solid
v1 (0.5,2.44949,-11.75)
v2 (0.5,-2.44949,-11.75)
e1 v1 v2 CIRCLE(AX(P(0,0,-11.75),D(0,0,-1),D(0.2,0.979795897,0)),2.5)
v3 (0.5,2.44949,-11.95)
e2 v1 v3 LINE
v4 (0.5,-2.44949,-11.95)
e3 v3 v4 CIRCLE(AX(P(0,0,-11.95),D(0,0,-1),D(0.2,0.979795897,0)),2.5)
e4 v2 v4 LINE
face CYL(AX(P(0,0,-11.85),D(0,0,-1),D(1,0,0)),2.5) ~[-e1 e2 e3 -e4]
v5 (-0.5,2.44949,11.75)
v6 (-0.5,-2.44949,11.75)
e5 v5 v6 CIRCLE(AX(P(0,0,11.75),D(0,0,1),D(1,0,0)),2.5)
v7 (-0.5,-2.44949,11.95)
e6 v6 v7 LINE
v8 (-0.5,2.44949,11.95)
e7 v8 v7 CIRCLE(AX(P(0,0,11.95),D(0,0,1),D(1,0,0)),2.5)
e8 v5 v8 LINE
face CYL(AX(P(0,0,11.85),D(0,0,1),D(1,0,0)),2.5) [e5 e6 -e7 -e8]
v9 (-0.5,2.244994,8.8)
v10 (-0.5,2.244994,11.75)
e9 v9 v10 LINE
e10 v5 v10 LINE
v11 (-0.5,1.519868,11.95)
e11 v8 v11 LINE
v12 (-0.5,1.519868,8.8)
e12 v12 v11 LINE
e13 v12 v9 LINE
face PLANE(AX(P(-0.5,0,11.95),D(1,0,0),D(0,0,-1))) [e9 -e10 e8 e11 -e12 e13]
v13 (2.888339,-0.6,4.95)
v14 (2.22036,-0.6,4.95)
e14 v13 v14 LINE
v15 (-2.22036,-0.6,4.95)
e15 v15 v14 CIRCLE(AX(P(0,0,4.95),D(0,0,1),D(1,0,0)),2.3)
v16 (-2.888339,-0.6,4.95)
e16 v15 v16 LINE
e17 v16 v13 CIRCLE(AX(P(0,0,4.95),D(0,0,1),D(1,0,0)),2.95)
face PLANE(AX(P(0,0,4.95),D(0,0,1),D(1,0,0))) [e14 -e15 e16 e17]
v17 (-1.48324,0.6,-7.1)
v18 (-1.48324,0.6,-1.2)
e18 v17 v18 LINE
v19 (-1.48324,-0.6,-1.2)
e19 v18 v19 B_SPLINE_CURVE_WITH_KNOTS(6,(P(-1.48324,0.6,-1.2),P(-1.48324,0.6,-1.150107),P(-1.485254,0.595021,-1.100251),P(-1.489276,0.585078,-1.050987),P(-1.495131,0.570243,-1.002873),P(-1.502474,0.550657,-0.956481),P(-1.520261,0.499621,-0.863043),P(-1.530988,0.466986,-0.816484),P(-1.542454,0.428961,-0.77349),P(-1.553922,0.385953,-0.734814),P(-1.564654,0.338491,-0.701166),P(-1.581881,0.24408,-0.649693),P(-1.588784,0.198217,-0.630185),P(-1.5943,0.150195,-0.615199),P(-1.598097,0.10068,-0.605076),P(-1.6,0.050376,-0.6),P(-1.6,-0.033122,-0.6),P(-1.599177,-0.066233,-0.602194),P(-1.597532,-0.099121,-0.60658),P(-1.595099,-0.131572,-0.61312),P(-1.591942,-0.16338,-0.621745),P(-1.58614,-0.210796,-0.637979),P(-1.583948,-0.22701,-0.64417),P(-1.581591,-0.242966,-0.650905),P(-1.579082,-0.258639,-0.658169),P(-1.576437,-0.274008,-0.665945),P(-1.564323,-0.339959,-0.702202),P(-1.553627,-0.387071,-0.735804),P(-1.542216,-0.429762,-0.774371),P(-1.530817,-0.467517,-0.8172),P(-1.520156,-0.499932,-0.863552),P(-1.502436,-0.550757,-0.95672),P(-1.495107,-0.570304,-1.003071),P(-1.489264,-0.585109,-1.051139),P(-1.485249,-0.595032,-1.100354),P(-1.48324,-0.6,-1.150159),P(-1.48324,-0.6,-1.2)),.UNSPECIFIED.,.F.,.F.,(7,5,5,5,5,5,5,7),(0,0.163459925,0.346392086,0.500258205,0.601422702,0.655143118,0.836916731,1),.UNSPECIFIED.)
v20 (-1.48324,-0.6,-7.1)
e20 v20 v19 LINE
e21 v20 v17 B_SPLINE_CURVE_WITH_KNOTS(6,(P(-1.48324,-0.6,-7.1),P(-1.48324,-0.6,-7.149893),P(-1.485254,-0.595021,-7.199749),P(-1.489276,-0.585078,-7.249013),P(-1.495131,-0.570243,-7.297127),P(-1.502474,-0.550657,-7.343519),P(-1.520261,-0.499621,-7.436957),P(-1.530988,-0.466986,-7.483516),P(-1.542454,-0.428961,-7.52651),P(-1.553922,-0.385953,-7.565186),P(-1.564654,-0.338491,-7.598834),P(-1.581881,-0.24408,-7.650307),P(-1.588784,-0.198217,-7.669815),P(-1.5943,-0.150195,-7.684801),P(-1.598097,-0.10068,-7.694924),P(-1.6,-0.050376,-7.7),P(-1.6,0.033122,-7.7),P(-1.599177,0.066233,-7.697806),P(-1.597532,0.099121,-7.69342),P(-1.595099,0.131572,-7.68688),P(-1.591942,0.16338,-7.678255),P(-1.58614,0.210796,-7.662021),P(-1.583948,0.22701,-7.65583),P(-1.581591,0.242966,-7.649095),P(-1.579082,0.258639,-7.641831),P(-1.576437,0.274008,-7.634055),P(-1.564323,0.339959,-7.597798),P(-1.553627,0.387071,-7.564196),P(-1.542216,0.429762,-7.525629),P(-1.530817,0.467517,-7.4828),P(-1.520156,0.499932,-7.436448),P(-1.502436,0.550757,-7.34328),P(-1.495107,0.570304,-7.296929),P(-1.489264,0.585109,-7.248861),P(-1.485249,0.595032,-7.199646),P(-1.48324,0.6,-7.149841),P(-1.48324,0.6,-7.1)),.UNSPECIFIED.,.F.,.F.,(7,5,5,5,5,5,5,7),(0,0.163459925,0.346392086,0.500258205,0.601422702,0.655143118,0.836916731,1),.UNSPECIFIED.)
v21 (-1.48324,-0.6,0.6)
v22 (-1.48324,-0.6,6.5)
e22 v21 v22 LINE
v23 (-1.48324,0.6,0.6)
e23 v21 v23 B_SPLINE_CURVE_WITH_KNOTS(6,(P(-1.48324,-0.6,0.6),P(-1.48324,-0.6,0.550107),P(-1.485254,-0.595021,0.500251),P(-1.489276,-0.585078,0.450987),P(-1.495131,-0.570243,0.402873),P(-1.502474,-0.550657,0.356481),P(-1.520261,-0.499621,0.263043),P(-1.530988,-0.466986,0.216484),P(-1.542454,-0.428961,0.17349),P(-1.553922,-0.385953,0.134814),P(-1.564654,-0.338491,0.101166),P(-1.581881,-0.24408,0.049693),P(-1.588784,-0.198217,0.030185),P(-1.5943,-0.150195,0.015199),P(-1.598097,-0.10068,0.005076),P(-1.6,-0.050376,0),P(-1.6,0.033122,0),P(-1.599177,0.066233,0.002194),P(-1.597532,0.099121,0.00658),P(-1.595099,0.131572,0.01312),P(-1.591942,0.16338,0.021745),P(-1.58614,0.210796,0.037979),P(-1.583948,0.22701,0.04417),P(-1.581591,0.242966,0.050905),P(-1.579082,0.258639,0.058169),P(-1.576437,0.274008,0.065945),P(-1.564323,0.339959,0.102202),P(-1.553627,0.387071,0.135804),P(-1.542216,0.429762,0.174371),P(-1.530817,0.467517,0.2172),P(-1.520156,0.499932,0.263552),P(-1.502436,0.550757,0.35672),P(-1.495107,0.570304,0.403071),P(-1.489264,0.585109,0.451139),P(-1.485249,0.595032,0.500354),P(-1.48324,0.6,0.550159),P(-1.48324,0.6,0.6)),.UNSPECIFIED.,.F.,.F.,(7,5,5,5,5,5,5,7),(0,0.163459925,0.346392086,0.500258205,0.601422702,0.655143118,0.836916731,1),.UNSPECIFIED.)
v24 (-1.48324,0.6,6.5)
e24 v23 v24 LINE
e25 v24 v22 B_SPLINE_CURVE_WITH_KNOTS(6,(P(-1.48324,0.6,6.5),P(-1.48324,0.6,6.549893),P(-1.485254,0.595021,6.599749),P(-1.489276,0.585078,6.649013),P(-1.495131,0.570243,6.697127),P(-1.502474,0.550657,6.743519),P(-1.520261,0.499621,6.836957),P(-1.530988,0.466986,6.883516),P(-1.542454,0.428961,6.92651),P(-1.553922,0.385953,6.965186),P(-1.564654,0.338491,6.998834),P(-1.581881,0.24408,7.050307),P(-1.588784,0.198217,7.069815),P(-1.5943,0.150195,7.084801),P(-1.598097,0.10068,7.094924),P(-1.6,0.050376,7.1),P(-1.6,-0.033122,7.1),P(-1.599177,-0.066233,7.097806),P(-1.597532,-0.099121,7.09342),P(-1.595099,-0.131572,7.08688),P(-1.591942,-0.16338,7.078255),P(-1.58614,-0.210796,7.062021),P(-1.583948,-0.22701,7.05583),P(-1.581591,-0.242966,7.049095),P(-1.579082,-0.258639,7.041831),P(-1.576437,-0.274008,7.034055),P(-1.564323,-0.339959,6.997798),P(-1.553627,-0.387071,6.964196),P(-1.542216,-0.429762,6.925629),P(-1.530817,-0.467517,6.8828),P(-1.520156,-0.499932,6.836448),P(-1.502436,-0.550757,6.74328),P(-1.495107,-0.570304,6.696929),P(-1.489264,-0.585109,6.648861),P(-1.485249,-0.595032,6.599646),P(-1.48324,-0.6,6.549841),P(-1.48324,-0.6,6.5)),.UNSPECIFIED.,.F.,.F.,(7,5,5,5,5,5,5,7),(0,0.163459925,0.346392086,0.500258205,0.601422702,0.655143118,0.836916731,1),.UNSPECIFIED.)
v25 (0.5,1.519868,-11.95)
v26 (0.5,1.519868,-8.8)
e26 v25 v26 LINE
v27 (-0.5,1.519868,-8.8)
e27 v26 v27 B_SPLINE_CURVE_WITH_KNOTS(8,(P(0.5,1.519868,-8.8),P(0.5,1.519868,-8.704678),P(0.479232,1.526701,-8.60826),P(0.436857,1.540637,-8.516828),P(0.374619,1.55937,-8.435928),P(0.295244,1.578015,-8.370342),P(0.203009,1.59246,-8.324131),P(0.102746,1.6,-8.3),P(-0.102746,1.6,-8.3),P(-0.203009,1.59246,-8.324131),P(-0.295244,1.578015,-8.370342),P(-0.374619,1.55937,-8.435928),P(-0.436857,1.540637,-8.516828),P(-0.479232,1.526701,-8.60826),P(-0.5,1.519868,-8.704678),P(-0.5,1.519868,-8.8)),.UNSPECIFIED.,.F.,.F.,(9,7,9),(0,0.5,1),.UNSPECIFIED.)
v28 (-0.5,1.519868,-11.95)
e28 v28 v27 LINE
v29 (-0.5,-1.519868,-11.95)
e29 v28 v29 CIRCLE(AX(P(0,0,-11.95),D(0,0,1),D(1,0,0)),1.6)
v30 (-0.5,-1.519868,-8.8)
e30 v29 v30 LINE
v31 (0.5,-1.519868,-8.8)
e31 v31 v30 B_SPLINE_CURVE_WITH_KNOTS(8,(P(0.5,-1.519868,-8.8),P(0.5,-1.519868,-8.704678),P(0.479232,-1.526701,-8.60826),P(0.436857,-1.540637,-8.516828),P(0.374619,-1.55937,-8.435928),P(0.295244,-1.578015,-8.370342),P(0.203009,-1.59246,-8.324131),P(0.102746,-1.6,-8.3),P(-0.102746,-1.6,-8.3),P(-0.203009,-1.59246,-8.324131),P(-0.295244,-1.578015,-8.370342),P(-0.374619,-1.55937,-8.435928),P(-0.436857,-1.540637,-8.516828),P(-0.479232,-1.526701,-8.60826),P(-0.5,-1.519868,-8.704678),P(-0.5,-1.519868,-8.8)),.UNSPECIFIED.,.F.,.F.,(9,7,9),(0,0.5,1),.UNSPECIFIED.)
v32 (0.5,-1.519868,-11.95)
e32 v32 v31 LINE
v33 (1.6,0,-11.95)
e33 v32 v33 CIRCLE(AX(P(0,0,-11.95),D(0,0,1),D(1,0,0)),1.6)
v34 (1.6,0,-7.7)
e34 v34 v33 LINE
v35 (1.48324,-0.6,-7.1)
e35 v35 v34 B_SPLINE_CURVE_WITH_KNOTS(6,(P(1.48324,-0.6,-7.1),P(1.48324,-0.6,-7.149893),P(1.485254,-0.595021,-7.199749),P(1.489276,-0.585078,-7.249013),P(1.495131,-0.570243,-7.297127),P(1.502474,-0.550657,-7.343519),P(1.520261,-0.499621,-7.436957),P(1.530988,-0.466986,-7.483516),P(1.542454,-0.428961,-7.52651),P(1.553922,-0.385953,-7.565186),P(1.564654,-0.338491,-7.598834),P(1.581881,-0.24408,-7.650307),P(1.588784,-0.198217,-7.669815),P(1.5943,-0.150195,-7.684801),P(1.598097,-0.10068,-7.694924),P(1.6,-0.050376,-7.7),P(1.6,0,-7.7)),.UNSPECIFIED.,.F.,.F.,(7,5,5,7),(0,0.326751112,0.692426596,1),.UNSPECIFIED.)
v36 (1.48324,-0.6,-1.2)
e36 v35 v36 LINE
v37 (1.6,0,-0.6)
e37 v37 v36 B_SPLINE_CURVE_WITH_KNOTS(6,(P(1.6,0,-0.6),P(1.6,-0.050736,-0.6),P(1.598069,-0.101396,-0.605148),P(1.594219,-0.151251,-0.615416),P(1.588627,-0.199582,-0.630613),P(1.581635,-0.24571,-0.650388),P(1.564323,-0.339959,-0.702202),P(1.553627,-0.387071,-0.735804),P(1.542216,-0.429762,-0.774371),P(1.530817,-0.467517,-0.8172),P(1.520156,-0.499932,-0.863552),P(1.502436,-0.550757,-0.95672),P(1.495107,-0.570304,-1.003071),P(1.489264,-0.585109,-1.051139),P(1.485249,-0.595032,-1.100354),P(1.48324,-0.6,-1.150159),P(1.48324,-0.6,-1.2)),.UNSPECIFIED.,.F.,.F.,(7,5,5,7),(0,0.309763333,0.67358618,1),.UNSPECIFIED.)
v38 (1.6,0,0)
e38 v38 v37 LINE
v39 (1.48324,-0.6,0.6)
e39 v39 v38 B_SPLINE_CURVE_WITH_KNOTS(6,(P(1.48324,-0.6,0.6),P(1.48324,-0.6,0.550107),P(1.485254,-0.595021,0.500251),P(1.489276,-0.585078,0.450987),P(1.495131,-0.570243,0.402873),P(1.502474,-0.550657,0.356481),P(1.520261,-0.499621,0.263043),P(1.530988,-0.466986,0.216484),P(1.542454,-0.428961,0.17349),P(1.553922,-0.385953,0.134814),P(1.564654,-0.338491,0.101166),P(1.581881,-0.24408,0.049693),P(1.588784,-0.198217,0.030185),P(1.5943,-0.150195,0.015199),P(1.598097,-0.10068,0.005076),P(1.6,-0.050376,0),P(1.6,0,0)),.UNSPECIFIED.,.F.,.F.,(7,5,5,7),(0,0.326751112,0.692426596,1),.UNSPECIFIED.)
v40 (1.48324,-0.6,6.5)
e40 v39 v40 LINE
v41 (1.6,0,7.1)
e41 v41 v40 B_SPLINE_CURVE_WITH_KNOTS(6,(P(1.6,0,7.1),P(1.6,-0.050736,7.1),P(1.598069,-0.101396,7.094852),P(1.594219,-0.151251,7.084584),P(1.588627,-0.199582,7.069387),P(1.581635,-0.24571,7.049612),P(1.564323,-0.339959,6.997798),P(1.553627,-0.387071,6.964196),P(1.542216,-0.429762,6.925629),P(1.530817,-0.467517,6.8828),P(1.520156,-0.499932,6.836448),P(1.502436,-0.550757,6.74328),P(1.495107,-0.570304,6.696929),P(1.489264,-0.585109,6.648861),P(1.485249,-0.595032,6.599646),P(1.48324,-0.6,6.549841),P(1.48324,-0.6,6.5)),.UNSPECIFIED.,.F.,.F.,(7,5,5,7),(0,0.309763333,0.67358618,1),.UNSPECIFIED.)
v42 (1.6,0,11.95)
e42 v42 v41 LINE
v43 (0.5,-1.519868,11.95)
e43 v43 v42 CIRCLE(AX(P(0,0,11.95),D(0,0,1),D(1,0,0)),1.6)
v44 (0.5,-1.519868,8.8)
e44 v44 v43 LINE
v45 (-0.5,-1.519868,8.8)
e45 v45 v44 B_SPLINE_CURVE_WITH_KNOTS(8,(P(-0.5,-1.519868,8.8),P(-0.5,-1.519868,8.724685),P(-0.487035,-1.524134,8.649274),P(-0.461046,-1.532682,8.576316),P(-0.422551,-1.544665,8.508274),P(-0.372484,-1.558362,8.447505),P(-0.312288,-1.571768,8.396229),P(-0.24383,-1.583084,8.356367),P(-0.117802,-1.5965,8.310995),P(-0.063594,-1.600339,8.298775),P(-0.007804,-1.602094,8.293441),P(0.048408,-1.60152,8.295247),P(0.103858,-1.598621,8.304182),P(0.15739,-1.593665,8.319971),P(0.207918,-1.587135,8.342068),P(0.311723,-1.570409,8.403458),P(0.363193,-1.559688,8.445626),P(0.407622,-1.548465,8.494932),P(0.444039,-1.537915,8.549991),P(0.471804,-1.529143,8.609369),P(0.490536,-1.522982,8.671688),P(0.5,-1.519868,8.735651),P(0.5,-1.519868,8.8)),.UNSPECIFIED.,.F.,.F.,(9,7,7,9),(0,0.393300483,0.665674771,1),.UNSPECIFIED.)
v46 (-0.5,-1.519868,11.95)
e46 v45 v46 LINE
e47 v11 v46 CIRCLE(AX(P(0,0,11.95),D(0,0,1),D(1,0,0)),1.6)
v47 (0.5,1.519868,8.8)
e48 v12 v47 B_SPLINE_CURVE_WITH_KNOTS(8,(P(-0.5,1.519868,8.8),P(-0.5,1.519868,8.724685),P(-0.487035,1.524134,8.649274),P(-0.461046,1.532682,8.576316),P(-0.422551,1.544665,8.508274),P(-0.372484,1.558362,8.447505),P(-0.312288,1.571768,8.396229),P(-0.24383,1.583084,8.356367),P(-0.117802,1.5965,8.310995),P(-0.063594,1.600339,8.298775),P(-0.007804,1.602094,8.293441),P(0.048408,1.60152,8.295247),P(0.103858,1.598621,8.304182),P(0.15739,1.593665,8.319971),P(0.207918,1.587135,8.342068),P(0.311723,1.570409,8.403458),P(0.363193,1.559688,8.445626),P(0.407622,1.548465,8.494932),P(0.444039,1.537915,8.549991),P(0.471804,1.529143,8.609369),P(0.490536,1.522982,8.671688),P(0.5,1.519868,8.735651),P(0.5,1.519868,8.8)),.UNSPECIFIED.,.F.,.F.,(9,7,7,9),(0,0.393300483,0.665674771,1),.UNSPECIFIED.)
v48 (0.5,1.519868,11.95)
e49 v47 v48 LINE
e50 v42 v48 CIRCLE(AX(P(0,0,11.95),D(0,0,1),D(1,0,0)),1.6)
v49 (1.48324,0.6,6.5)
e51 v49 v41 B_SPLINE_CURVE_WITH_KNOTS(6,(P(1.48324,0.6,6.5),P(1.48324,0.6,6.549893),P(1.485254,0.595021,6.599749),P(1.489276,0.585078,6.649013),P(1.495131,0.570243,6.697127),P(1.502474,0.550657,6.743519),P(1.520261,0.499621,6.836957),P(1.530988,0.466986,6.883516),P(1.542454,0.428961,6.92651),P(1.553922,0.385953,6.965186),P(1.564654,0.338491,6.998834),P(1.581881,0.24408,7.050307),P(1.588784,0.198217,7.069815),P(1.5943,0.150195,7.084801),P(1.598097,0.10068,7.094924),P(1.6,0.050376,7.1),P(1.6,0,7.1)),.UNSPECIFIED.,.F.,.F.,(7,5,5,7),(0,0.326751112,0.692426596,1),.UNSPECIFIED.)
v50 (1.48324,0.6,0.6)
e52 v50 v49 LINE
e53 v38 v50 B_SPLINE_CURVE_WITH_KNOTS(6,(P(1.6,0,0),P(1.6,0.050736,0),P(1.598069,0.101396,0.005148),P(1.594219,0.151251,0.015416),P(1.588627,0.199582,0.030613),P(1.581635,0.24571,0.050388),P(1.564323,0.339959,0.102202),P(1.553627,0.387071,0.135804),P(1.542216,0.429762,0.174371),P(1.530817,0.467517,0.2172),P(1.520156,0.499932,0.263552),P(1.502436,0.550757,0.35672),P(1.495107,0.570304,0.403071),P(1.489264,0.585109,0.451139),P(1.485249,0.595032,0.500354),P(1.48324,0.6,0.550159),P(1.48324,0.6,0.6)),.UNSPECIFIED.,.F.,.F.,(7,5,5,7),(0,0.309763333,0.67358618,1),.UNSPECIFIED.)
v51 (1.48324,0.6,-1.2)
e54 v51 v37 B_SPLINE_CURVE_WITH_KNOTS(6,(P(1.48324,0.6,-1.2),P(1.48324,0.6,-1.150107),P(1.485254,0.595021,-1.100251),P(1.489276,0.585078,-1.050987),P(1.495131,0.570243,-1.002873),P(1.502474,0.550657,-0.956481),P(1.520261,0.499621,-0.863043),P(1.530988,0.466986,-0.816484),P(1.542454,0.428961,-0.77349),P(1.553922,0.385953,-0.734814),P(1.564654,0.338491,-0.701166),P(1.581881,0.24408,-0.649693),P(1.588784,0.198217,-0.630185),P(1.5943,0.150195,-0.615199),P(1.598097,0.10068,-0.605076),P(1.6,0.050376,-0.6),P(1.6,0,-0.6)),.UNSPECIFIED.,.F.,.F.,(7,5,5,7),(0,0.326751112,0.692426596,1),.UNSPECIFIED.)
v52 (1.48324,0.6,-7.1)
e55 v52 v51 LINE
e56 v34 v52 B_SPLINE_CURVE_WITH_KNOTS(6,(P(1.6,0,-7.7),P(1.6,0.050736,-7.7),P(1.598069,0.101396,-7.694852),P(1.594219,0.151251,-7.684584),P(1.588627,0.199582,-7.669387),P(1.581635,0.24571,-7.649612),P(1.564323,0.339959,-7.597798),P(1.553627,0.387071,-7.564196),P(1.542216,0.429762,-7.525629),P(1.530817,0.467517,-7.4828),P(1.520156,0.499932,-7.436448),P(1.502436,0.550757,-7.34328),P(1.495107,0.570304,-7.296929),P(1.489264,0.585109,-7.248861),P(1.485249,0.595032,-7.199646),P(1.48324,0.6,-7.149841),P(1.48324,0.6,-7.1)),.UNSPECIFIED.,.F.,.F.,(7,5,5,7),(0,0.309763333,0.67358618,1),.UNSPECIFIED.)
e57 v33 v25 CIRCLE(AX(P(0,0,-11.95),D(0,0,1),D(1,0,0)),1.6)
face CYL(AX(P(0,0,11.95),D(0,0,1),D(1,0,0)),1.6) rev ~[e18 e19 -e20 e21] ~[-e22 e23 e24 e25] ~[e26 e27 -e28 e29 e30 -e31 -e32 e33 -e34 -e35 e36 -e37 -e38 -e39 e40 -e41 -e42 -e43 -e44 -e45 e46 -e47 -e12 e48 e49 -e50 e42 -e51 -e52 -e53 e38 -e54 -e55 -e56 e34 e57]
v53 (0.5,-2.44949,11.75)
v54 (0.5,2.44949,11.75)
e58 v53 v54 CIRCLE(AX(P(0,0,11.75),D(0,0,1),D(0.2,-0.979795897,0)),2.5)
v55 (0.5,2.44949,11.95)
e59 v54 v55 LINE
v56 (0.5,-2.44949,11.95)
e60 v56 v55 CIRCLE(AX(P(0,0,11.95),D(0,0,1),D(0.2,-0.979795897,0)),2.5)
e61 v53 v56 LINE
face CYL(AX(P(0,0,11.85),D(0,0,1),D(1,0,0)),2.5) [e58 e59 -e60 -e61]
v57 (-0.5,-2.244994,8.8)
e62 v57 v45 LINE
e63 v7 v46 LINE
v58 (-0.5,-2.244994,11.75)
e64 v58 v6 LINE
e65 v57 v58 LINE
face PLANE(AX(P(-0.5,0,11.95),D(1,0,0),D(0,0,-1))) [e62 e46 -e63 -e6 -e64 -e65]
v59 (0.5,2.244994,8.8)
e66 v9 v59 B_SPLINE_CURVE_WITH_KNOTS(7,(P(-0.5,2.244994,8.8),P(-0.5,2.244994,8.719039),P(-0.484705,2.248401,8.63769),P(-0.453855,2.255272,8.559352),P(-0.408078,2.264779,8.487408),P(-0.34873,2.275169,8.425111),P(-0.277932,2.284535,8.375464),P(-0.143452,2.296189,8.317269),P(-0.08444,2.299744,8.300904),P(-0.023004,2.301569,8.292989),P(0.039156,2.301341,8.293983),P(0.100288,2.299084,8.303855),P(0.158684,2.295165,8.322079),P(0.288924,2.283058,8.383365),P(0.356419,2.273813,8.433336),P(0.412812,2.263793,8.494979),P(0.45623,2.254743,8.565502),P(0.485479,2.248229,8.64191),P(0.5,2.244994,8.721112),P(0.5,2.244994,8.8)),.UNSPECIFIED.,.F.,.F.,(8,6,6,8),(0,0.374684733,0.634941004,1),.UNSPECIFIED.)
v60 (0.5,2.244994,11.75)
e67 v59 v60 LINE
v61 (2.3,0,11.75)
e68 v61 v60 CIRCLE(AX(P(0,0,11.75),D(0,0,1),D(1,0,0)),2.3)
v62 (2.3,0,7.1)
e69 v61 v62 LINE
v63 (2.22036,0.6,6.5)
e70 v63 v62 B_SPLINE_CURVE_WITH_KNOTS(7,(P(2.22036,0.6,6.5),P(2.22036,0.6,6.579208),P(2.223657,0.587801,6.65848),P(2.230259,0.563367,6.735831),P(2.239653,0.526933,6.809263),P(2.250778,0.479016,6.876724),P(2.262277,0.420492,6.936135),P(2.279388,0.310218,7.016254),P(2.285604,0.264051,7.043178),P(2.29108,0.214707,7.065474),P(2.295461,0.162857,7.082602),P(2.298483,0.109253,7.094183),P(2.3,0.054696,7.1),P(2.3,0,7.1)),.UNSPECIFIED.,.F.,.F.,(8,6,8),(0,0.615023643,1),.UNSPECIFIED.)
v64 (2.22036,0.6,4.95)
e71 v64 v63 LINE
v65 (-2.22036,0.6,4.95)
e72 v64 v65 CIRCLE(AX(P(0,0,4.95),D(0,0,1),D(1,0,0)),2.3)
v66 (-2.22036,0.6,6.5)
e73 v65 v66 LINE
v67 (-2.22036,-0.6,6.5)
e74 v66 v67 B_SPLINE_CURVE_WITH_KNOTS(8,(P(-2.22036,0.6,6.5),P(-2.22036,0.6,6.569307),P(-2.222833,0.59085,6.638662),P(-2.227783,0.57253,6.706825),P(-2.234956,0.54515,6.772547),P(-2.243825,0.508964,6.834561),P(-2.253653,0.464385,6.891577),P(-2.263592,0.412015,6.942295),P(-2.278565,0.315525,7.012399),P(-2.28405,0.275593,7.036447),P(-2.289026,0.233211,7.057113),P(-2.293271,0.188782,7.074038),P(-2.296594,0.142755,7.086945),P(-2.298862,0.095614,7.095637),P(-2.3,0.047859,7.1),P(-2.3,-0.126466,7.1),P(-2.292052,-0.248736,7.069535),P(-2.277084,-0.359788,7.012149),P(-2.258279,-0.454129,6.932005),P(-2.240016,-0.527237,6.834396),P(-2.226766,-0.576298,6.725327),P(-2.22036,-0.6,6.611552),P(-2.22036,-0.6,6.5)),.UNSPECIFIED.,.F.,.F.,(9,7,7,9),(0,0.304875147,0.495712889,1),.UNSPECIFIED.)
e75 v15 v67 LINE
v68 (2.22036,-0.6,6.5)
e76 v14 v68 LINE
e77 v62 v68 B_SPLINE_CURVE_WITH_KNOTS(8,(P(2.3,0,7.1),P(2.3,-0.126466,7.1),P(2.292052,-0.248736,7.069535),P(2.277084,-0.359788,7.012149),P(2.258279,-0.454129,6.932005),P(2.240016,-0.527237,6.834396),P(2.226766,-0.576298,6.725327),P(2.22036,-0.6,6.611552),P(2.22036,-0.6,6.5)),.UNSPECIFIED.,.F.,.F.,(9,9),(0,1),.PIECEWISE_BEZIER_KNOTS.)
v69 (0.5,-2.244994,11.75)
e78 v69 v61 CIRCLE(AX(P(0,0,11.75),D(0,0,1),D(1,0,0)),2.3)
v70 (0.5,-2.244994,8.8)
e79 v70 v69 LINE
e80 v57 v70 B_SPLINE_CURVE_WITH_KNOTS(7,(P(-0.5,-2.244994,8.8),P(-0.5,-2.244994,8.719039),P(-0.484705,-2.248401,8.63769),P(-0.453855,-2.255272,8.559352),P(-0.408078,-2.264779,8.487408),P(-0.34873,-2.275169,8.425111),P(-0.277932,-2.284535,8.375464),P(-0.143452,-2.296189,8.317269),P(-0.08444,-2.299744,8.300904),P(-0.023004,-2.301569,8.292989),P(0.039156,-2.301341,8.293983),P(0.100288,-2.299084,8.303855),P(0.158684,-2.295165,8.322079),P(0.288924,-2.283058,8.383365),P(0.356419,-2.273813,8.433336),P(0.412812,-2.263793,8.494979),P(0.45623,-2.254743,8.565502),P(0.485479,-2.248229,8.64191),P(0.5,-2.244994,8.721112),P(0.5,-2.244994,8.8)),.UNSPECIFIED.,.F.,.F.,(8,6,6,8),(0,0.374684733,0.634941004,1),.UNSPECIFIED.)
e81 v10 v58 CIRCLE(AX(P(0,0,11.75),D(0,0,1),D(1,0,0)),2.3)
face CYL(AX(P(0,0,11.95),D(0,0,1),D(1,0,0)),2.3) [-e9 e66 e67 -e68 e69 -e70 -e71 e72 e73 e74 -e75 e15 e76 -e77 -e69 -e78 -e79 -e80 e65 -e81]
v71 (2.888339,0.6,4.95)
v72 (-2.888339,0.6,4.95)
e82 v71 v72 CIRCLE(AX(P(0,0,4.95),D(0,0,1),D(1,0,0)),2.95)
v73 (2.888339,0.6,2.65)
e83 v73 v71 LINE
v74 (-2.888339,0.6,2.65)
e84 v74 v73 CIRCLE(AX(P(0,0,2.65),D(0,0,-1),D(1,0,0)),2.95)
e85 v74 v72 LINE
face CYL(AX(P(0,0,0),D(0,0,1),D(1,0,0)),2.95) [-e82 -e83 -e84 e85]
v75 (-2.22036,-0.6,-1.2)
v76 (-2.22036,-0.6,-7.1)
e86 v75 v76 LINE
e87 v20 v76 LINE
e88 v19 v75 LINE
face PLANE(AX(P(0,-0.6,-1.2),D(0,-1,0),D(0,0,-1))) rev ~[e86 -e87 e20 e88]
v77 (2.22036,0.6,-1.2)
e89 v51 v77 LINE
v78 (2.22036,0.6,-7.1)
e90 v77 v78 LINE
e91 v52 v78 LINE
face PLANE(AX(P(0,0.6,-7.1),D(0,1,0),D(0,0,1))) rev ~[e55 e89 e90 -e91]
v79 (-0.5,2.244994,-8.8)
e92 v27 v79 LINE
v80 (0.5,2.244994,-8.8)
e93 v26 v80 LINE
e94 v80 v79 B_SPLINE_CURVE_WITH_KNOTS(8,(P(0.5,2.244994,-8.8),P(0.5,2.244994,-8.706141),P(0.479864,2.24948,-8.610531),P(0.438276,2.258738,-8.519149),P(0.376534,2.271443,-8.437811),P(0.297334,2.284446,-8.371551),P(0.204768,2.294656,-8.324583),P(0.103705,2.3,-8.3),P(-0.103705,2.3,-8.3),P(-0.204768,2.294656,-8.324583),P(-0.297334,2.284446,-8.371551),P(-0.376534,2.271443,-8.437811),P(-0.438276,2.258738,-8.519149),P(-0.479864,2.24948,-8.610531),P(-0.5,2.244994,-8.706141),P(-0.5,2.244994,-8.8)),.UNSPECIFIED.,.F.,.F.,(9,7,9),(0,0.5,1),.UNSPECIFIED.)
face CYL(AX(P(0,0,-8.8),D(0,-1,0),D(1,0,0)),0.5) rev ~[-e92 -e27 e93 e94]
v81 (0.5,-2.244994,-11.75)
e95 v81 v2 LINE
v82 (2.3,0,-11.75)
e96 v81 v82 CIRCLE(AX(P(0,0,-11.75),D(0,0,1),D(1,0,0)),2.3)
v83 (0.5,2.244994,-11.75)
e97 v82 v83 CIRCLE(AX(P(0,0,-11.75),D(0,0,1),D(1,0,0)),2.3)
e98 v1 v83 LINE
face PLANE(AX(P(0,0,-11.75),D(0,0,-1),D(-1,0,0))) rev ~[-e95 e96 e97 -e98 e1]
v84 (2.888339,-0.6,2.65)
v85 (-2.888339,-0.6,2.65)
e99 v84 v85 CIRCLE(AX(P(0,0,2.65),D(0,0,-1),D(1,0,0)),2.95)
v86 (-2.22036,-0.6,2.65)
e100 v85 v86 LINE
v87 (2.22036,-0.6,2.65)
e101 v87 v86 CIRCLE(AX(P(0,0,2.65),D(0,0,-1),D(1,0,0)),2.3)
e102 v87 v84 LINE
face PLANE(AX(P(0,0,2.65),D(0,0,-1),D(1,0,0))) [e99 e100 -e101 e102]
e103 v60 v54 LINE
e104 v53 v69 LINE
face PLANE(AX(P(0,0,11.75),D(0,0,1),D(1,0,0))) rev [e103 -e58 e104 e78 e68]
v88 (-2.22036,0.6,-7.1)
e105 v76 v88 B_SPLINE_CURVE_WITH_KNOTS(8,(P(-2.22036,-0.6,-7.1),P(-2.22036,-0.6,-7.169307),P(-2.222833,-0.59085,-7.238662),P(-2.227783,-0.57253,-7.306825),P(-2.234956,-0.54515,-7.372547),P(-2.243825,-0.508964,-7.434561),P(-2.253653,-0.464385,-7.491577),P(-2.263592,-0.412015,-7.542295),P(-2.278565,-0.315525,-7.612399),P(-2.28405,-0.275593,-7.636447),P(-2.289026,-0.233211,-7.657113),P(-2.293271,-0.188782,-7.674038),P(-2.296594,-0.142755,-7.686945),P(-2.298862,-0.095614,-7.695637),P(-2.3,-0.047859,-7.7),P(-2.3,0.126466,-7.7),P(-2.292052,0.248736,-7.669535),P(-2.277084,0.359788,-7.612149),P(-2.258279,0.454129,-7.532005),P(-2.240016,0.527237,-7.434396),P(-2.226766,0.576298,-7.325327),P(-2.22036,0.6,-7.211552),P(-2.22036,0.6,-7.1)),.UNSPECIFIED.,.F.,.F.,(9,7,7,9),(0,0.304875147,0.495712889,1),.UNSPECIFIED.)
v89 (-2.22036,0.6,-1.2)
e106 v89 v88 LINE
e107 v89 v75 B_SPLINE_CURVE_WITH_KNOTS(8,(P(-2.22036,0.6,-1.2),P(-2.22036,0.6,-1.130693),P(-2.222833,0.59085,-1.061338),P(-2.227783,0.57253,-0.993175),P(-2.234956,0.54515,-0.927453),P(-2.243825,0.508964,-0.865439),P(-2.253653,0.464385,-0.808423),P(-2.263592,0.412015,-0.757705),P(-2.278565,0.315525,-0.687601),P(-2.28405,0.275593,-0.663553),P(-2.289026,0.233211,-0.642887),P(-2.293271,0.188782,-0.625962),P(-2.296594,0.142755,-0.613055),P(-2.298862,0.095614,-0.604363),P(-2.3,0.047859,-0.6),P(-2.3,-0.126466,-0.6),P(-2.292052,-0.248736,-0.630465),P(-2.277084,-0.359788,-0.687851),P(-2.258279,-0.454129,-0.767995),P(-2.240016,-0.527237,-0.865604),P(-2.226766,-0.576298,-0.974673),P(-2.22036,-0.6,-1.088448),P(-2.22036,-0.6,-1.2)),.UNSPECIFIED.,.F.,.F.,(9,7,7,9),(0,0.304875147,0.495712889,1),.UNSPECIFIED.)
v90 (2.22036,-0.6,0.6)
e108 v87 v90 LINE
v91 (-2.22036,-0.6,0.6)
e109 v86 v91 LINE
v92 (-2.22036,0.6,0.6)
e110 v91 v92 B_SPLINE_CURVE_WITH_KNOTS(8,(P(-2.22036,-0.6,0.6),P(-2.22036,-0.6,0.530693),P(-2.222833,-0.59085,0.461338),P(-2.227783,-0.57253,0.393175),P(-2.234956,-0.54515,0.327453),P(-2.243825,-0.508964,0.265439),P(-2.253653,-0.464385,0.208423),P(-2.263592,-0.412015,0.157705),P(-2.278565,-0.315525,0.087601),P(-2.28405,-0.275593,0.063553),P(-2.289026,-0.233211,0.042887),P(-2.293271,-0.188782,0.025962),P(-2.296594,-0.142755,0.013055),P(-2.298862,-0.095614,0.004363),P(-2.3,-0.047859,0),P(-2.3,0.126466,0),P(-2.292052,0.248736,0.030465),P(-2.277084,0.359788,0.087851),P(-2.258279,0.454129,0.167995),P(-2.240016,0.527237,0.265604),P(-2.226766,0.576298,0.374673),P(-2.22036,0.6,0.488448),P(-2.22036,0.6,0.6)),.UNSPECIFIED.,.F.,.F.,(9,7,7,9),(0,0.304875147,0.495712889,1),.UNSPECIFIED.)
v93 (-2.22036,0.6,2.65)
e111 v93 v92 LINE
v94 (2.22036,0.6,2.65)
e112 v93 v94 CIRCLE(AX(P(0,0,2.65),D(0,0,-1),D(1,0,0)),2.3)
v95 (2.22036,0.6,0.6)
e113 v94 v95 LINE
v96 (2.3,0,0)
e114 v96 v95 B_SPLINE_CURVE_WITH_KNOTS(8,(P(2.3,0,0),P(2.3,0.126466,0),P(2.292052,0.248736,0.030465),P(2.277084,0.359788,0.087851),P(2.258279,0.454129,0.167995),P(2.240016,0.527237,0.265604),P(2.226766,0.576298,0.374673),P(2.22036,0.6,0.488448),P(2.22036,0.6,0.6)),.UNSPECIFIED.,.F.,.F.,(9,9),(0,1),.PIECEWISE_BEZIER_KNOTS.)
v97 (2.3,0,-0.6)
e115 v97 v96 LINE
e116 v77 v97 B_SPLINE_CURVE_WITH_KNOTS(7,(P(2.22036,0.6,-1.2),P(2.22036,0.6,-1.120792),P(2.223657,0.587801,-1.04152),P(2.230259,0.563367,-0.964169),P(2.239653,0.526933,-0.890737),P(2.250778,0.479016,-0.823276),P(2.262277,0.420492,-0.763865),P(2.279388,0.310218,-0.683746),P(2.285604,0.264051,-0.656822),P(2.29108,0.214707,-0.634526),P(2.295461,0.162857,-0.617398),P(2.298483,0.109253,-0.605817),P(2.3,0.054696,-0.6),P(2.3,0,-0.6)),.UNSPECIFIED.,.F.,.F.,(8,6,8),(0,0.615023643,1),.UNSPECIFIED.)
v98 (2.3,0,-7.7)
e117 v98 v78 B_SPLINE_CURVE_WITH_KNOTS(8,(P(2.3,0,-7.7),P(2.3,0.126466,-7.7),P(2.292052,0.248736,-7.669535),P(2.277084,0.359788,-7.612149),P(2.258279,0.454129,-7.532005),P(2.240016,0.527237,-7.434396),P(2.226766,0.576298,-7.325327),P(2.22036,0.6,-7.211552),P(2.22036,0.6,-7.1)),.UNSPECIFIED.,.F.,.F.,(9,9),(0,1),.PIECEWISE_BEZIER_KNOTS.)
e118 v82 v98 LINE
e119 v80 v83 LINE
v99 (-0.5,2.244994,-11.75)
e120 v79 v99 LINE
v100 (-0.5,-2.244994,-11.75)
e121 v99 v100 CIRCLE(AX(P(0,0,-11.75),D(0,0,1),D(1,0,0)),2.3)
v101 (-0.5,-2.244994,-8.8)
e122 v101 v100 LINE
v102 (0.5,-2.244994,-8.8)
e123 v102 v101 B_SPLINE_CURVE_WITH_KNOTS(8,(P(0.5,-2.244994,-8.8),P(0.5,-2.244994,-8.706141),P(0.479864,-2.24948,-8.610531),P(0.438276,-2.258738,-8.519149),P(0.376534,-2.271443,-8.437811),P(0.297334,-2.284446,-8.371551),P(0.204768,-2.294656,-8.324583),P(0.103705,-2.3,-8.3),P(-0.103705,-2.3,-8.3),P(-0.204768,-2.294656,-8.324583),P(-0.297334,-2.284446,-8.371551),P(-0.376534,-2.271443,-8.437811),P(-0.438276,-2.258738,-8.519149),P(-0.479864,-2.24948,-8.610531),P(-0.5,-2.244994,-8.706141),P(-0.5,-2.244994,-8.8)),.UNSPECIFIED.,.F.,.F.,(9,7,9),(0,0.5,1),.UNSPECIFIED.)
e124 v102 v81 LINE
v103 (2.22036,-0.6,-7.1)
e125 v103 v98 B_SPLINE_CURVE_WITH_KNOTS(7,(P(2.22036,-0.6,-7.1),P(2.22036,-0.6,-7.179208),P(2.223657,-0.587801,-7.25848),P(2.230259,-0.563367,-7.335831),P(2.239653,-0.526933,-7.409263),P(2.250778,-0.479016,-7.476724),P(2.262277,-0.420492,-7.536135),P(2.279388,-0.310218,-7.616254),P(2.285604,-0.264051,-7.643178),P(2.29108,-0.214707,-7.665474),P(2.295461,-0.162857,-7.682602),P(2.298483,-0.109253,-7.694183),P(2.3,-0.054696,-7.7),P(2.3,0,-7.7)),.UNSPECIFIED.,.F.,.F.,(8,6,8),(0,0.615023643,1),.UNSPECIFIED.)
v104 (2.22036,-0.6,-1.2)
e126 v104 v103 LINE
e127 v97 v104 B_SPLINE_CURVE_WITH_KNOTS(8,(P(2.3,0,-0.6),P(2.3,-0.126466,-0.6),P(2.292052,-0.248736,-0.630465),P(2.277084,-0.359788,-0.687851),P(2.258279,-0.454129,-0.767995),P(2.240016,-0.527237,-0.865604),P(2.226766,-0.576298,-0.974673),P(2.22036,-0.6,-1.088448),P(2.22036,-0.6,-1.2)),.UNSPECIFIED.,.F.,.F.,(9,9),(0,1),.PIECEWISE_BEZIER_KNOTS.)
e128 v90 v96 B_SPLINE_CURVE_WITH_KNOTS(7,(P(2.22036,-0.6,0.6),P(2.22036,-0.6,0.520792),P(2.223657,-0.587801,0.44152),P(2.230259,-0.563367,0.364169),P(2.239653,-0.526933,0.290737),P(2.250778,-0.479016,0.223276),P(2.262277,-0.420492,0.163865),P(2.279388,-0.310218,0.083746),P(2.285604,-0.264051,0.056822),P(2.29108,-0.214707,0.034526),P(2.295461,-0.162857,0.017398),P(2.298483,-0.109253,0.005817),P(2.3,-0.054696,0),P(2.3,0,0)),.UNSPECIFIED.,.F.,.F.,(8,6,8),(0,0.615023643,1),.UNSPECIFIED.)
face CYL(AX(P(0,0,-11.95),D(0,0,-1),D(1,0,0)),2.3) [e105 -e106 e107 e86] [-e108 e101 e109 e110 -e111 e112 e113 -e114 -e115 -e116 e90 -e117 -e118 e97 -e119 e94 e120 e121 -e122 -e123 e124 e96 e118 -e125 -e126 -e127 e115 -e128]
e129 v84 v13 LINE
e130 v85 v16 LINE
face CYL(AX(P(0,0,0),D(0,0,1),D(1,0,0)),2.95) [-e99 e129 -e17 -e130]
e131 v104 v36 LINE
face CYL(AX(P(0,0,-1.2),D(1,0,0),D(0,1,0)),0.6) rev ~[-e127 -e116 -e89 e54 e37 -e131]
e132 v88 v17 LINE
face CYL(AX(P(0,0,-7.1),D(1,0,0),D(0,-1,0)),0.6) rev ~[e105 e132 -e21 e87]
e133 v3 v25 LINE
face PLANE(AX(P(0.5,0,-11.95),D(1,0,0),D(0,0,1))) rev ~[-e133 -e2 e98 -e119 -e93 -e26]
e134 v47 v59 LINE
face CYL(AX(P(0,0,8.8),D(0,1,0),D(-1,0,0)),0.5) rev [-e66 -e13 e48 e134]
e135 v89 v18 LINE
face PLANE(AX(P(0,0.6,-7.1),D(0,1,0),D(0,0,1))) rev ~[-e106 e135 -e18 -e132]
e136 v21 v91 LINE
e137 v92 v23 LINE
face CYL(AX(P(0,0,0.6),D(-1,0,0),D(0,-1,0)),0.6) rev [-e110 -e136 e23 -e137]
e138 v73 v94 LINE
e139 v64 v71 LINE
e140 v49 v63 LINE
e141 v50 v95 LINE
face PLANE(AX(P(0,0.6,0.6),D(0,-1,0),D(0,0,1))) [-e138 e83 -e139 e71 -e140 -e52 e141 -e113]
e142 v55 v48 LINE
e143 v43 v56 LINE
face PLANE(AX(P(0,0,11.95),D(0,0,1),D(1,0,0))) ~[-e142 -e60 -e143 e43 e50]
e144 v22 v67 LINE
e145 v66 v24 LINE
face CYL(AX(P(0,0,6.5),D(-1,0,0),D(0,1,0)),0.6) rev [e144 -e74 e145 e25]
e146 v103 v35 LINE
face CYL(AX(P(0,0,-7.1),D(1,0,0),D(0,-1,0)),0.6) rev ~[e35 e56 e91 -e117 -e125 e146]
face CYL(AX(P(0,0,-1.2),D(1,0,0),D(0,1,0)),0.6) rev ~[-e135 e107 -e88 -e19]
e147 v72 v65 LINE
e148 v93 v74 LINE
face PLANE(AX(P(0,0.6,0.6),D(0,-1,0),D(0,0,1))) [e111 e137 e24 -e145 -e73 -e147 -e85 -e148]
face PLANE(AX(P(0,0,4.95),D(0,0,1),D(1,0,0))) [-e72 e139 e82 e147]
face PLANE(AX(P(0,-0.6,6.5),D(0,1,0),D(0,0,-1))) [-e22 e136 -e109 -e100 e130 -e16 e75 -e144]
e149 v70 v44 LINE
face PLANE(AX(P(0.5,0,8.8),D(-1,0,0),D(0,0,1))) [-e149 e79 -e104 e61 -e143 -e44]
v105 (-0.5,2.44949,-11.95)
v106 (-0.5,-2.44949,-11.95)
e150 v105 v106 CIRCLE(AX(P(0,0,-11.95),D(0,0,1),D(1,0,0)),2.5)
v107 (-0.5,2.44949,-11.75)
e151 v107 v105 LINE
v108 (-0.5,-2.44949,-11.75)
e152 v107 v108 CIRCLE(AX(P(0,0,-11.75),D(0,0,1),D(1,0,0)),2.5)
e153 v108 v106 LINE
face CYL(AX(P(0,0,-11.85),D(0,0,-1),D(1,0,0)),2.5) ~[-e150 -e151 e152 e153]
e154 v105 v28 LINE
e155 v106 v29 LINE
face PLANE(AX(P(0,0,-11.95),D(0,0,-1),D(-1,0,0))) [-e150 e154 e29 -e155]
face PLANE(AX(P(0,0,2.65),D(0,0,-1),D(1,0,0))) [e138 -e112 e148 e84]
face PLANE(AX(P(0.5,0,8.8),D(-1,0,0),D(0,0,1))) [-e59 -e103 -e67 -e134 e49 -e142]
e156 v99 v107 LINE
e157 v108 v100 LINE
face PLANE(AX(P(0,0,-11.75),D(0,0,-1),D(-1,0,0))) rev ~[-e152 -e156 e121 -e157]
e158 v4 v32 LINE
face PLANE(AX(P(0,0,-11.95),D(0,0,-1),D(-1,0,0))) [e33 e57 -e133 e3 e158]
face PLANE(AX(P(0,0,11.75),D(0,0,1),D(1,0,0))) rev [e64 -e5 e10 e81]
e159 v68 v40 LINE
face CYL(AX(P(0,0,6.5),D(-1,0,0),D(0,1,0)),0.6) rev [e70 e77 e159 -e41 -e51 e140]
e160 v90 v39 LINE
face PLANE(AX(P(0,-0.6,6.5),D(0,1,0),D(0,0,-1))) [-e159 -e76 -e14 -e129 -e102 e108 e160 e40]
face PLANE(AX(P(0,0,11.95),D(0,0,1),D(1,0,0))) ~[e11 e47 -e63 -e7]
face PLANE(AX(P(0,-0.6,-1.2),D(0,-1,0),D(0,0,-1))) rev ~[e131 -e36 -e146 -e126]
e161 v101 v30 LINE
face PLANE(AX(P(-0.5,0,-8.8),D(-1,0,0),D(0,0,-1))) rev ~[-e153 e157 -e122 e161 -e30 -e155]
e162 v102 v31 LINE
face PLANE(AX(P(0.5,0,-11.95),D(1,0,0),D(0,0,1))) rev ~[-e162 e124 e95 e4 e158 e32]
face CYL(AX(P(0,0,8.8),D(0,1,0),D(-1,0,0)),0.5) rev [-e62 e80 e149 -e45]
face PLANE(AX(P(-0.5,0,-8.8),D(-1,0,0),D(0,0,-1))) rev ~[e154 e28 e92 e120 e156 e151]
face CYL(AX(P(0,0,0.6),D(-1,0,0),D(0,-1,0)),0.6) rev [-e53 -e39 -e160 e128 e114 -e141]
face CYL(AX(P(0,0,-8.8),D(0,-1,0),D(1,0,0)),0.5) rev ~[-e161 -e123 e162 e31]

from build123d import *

# Parameters (mm, degrees)
F0_R      = 2.95
F1_DEPTH  = 11.95
F2_R      = 2.95
F2_R_2    = 2.3
F3_DEPTH  = 7
F4_R      = 2.95
F4_R_2    = 2.3
F5_DEPTH  = 14.6
F6_R      = 1.6
F7_DEPTH  = 23.901
F9_DEPTH  = 12.5
F10_W     = 0.2
F10_H     = 0.2
F12_DEPTH = 12.5
F13_DEPTH = 12.5
F15_DEPTH = 12.5


# Not quite as in the source:
# - a pattern or mirror of a feature is missing from the dataset's text; its kind, count and spacing are read off the source's solid


with BuildPart() as f1:
    # F0 (on Top) → F1 (new body, symmetric)
    with BuildSketch(Plane.XY):
        Circle(F0_R)
    extrude(amount=F1_DEPTH, both=True)

    # F2 (on face) → F3 (cut)
    with BuildSketch(Plane.XY.offset(11.95)):
        Circle(F2_R)
        Circle(F2_R_2, mode=Mode.SUBTRACT)
    extrude(amount=-F3_DEPTH, mode=Mode.SUBTRACT)

    # F4 (on face) → F5 (cut)
    with BuildSketch(Plane(origin=(0, 0, -11.95), x_dir=(1, 0, 0), z_dir=(0, 0, -1))):
        Circle(F4_R)
        Circle(F4_R_2, mode=Mode.SUBTRACT)
    extrude(amount=-F5_DEPTH, mode=Mode.SUBTRACT)

    # F6 (on face) → F7 (cut, through all)
    with BuildSketch(Plane.XY.offset(11.95)):
        Circle(F6_R)
    extrude(amount=-F7_DEPTH, mode=Mode.SUBTRACT)

    # F8 (on Front) → F9 (cut, symmetric)
    with BuildSketch(Plane.XZ):
        with BuildLine():
            ThreePointArc((0.5, 8.8), (0, 9.3), (-0.5, 8.8))
            Line((-0.5, 8.8), (0.5, 8.8))
        make_face()
        with BuildLine():
            Line((-0.5, 11.95), (-0.5, 8.8))
            ThreePointArc((-0.5, 8.8), (0, 9.3), (0.5, 8.8))
            Line((0.5, 8.8), (0.5, 11.95))
            Line((0.5, 11.95), (-0.5, 11.95))
        make_face()
        with BuildLine():
            Line((0.5, 8.8), (-0.5, 8.8))
            ThreePointArc((-0.5, 8.8), (0, 8.3), (0.5, 8.8))
        make_face()
        with BuildLine():
            Line((-0.5, -8.8), (-0.5, -11.95))
            Line((-0.5, -11.95), (0.5, -11.95))
            Line((0.5, -11.95), (0.5, -8.8))
            ThreePointArc((0.5, -8.8), (0, -9.3), (-0.5, -8.8))
        make_face()
        with BuildLine():
            ThreePointArc((0.5, -8.8), (0, -8.3), (-0.5, -8.8))
            Line((-0.5, -8.8), (0.5, -8.8))
        make_face()
        with BuildLine():
            Line((0.5, -8.8), (-0.5, -8.8))
            ThreePointArc((-0.5, -8.8), (0, -9.3), (0.5, -8.8))
        make_face()
    extrude(amount=F9_DEPTH, both=True, mode=Mode.SUBTRACT)

    # F10 (on Front) → F11 (revolve)
    with BuildSketch(Plane.XZ):
        with Locations((2.4, 11.85)):
            Rectangle(F10_W, F10_H)
    f11 = revolve(axis=Axis((0, 0, 11.95), (0, 0, 1)))

    # F11_copies: F11 across plane
    add(f11.mirror(Plane(origin=(0, 0, 0), x_dir=(-1, 0, 0), z_dir=(0, 0, -1))))

    # F8 (on Front) → F12 (cut, symmetric)
    with BuildSketch(Plane.XZ):
        with BuildLine():
            ThreePointArc((0.5, 8.8), (0, 9.3), (-0.5, 8.8))
            Line((-0.5, 8.8), (0.5, 8.8))
        make_face()
        with BuildLine():
            Line((-0.5, 11.95), (-0.5, 8.8))
            ThreePointArc((-0.5, 8.8), (0, 9.3), (0.5, 8.8))
            Line((0.5, 8.8), (0.5, 11.95))
            Line((0.5, 11.95), (-0.5, 11.95))
        make_face()
        with BuildLine():
            Line((0.5, 8.8), (-0.5, 8.8))
            ThreePointArc((-0.5, 8.8), (0, 8.3), (0.5, 8.8))
        make_face()
        with BuildLine():
            Line((-0.5, -8.8), (-0.5, -11.95))
            Line((-0.5, -11.95), (0.5, -11.95))
            Line((0.5, -11.95), (0.5, -8.8))
            ThreePointArc((0.5, -8.8), (0, -9.3), (-0.5, -8.8))
        make_face()
        with BuildLine():
            ThreePointArc((0.5, -8.8), (0, -8.3), (-0.5, -8.8))
            Line((-0.5, -8.8), (0.5, -8.8))
        make_face()
        with BuildLine():
            Line((0.5, -8.8), (-0.5, -8.8))
            ThreePointArc((-0.5, -8.8), (0, -9.3), (0.5, -8.8))
        make_face()
    extrude(amount=F12_DEPTH, both=True, mode=Mode.SUBTRACT)

    # F8 (on Front) → F13 (cut, symmetric)
    with BuildSketch(Plane.XZ):
        with BuildLine():
            ThreePointArc((0.5, 8.8), (0, 9.3), (-0.5, 8.8))
            Line((-0.5, 8.8), (0.5, 8.8))
        make_face()
        with BuildLine():
            Line((-0.5, 11.95), (-0.5, 8.8))
            ThreePointArc((-0.5, 8.8), (0, 9.3), (0.5, 8.8))
            Line((0.5, 8.8), (0.5, 11.95))
            Line((0.5, 11.95), (-0.5, 11.95))
        make_face()
        with BuildLine():
            Line((0.5, 8.8), (-0.5, 8.8))
            ThreePointArc((-0.5, 8.8), (0, 8.3), (0.5, 8.8))
        make_face()
        with BuildLine():
            Line((-0.5, -8.8), (-0.5, -11.95))
            Line((-0.5, -11.95), (0.5, -11.95))
            Line((0.5, -11.95), (0.5, -8.8))
            ThreePointArc((0.5, -8.8), (0, -9.3), (-0.5, -8.8))
        make_face()
        with BuildLine():
            ThreePointArc((0.5, -8.8), (0, -8.3), (-0.5, -8.8))
            Line((-0.5, -8.8), (0.5, -8.8))
        make_face()
        with BuildLine():
            Line((0.5, -8.8), (-0.5, -8.8))
            ThreePointArc((-0.5, -8.8), (0, -9.3), (0.5, -8.8))
        make_face()
    extrude(amount=F13_DEPTH, both=True, mode=Mode.SUBTRACT)

    # F14 (on Right) → F15 (cut, symmetric)
    with BuildSketch(Plane.YZ):
        with BuildLine():
            ThreePointArc((-0.6, 0.6), (0, 0), (0.6, 0.6))
            Line((0.6, 0.6), (-0.6, 0.6))
        make_face()
        with BuildLine():
            ThreePointArc((-0.6, 0.6), (0, 1.2), (0.6, 0.6))
            Line((0.6, 0.6), (0.6, 6.5))
            ThreePointArc((0.6, 6.5), (0, 5.9), (-0.6, 6.5))
            Line((-0.6, 6.5), (-0.6, 0.6))
        make_face()
        with BuildLine():
            Line((-0.6, 0.6), (0.6, 0.6))
            ThreePointArc((0.6, 0.6), (0, 1.2), (-0.6, 0.6))
        make_face()
        with BuildLine():
            ThreePointArc((-0.6, 6.5), (0, 5.9), (0.6, 6.5))
            Line((0.6, 6.5), (-0.6, 6.5))
        make_face()
        with BuildLine():
            Line((-0.6, 6.5), (0.6, 6.5))
            ThreePointArc((0.6, 6.5), (0, 7.1), (-0.6, 6.5))
        make_face()
        with BuildLine():
            ThreePointArc((-0.6, -7.1), (0, -7.7), (0.6, -7.1))
            Line((0.6, -7.1), (-0.6, -7.1))
        make_face()
        with BuildLine():
            ThreePointArc((-0.6, -7.1), (0, -6.5), (0.6, -7.1))
            Line((0.6, -7.1), (0.6, -1.2))
            ThreePointArc((0.6, -1.2), (0, -1.8), (-0.6, -1.2))
            Line((-0.6, -1.2), (-0.6, -7.1))
        make_face()
        with BuildLine():
            Line((-0.6, -7.1), (0.6, -7.1))
            ThreePointArc((0.6, -7.1), (0, -6.5), (-0.6, -7.1))
        make_face()
        with BuildLine():
            ThreePointArc((-0.6, -1.2), (0, -1.8), (0.6, -1.2))
            Line((0.6, -1.2), (-0.6, -1.2))
        make_face()
        with BuildLine():
            Line((-0.6, -1.2), (0.6, -1.2))
            ThreePointArc((0.6, -1.2), (0, -0.6), (-0.6, -1.2))
        make_face()
    extrude(amount=F15_DEPTH, both=True, mode=Mode.SUBTRACT)


solid = f1.part
